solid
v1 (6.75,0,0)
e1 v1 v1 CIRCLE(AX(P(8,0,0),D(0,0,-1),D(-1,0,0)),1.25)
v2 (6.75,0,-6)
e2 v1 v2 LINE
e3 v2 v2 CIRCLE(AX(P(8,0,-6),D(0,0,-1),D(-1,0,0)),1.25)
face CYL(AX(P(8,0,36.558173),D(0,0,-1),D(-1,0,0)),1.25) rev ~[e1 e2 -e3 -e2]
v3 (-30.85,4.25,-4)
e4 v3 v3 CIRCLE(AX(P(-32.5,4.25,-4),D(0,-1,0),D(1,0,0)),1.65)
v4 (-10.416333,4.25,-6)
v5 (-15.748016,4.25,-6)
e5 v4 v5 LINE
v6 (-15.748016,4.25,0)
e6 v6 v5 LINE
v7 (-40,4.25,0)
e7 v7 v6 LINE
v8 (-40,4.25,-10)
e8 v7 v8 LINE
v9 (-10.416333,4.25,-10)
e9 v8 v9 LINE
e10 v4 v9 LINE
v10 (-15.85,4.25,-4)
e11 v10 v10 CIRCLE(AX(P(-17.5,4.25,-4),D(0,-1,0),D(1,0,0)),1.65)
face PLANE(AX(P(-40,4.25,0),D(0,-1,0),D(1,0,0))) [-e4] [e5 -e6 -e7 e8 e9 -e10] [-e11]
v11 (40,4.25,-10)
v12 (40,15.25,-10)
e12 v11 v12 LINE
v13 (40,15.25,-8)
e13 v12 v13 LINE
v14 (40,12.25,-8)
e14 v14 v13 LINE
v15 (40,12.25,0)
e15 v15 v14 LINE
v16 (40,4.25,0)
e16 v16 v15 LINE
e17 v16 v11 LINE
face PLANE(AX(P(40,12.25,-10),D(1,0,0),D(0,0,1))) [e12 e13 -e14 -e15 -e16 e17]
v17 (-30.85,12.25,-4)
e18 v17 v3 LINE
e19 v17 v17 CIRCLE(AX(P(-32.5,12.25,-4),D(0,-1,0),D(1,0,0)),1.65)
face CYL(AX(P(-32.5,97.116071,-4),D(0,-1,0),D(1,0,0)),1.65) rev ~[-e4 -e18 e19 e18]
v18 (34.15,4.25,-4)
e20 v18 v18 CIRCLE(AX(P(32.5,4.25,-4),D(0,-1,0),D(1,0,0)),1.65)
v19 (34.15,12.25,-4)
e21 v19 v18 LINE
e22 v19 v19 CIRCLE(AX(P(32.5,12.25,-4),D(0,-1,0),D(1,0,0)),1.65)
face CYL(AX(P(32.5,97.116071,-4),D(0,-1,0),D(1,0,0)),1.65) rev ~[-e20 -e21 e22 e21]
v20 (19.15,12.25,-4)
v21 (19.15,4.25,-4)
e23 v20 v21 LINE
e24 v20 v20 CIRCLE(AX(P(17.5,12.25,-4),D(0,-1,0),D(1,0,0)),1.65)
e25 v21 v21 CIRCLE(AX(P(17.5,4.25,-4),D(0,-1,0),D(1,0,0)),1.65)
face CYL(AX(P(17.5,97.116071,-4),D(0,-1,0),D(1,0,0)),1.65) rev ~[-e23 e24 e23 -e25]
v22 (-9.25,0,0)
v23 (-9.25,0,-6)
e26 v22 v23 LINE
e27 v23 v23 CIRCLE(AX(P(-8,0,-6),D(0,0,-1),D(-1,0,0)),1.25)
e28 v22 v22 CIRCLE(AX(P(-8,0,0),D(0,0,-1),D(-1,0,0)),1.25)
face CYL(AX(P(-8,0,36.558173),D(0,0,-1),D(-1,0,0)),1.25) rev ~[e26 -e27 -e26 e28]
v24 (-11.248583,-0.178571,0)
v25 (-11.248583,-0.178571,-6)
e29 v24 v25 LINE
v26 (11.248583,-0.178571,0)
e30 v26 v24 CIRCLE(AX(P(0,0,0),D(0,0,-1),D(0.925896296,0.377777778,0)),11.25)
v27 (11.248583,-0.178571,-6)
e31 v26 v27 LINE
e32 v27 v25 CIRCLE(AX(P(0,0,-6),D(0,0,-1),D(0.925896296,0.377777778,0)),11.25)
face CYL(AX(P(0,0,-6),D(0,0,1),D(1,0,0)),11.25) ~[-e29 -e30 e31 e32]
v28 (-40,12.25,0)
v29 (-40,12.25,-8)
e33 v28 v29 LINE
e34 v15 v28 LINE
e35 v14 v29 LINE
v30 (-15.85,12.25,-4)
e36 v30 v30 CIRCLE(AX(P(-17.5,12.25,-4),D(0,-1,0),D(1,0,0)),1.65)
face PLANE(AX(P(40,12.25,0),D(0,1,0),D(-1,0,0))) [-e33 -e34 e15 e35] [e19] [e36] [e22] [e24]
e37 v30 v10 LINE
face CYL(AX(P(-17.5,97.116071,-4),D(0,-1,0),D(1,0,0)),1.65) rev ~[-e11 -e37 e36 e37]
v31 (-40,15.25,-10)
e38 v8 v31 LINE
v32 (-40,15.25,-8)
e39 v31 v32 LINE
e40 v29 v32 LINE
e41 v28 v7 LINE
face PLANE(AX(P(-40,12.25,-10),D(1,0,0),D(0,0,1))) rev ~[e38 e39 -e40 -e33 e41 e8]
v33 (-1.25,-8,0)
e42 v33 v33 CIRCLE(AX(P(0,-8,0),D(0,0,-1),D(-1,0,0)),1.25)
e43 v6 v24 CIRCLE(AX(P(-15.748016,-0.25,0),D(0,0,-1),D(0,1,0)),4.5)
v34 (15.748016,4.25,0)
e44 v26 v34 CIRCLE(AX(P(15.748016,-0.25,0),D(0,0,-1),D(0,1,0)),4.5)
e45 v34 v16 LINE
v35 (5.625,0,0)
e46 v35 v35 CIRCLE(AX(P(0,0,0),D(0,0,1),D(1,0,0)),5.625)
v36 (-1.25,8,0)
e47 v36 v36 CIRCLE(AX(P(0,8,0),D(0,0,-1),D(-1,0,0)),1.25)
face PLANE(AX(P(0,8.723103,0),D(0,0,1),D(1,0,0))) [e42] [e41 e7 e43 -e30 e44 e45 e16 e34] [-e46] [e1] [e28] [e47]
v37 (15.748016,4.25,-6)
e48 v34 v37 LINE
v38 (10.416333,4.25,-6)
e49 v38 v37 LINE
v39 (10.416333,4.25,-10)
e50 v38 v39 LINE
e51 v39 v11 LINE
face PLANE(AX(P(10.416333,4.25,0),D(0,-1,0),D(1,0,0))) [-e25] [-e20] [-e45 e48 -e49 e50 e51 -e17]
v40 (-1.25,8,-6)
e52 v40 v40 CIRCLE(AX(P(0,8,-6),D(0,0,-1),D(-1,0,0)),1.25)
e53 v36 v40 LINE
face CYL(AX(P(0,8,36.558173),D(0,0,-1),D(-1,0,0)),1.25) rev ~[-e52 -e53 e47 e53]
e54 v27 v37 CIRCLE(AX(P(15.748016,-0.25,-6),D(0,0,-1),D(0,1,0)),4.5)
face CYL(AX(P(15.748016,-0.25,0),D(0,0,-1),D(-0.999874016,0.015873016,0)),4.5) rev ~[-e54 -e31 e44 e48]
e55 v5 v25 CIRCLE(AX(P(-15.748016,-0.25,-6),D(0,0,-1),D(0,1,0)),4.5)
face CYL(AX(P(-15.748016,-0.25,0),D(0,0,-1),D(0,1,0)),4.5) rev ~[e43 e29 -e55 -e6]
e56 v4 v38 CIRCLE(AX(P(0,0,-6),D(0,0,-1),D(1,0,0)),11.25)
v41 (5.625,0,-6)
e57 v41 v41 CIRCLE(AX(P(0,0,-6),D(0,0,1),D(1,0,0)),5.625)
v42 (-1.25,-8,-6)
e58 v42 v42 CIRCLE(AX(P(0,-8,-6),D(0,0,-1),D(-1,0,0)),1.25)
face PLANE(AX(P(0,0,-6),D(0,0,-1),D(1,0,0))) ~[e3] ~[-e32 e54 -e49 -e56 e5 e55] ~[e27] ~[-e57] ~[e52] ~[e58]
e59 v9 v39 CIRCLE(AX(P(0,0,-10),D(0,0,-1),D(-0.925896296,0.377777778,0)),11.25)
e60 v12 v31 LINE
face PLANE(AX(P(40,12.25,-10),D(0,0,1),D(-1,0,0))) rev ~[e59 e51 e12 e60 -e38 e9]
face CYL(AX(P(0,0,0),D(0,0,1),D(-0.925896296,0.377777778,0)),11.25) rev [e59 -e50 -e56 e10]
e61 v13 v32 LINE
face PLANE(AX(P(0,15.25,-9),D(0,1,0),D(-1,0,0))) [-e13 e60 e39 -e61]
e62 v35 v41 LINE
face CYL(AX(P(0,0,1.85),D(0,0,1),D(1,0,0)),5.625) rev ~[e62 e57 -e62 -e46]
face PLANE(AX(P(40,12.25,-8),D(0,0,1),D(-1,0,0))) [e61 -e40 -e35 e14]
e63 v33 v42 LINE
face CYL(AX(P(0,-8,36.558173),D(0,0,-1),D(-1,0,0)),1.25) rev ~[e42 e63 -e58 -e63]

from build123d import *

# Parameters (mm, degrees)
F4_D      = 2.5
F3_R      = 5.625
F5_DEPTH  = 18.001
F7_DEPTH  = 10
F8_R      = 4.5
F9_W      = 80
F9_H      = 2
F10_DEPTH = 3
F12_D     = 3.3


with BuildPart() as f1:
    # F0 (on Front) → F1 (revolve)
    with BuildSketch(Plane.XZ):
        Polygon((5.125, 1.85), (3.5, 1.85), (3.5, -16.15), (5.125, -16.15), (5.125, -6), (11.25, -6), (11.25, 0), (5.125, 0), align=None)
    revolve(axis=Axis((0, 0, -12.1311874992), (0, 0, -1)))

    # F4 (through all)
    with Locations(Plane.XY):
        with Locations((0, 8), (8, 0), (0, -8), (-8, 0)):
            Hole(F4_D / 2)

    # F3 (on face) → F5 (cut, through all)
    with BuildSketch(Plane.XY.offset(1.85)):
        Circle(F3_R)
    extrude(amount=-F5_DEPTH, mode=Mode.SUBTRACT)

    # F6 (on face) → F7 (join)
    with BuildSketch(Plane.XY):
        with BuildLine():
            ThreePointArc((-10.416333328, 4.25), (0, 11.25), (10.416333328, 4.25))
            Line((10.416333328, 4.25), (40, 4.25))
            Line((40, 4.25), (40, 12.25))
            Line((40, 12.25), (-40, 12.25))
            Line((-40, 12.25), (-40, 4.25))
            Line((-40, 4.25), (-10.416333328, 4.25))
        make_face()
    extrude(amount=-F7_DEPTH)

    # F8
    f8_edges = [f1.edges().sort_by_distance(p)[0] for p in [
        (10.416333, 4.25, -3),
        (-10.416333, 4.25, -3),
    ]]
    fillet(f8_edges, radius=F8_R)

    # F9 (on face) → F10 (join)
    with BuildSketch(Plane(origin=(0, 12.25, 0), x_dir=(-1, 0, 0), z_dir=(0, 1, 0))):
        with Locations((0, -9)):
            Rectangle(F9_W, F9_H)
    extrude(amount=F10_DEPTH)

    # F12 (through all)
    with Locations(Plane(origin=(0, 12.25, 0), x_dir=(-1, 0, 0), z_dir=(0, 1, 0))):
        with Locations((-32.5, -4), (-17.5, -4), (17.5, -4), (32.5, -4)):
            Hole(F12_D / 2)


solid = f1.part
